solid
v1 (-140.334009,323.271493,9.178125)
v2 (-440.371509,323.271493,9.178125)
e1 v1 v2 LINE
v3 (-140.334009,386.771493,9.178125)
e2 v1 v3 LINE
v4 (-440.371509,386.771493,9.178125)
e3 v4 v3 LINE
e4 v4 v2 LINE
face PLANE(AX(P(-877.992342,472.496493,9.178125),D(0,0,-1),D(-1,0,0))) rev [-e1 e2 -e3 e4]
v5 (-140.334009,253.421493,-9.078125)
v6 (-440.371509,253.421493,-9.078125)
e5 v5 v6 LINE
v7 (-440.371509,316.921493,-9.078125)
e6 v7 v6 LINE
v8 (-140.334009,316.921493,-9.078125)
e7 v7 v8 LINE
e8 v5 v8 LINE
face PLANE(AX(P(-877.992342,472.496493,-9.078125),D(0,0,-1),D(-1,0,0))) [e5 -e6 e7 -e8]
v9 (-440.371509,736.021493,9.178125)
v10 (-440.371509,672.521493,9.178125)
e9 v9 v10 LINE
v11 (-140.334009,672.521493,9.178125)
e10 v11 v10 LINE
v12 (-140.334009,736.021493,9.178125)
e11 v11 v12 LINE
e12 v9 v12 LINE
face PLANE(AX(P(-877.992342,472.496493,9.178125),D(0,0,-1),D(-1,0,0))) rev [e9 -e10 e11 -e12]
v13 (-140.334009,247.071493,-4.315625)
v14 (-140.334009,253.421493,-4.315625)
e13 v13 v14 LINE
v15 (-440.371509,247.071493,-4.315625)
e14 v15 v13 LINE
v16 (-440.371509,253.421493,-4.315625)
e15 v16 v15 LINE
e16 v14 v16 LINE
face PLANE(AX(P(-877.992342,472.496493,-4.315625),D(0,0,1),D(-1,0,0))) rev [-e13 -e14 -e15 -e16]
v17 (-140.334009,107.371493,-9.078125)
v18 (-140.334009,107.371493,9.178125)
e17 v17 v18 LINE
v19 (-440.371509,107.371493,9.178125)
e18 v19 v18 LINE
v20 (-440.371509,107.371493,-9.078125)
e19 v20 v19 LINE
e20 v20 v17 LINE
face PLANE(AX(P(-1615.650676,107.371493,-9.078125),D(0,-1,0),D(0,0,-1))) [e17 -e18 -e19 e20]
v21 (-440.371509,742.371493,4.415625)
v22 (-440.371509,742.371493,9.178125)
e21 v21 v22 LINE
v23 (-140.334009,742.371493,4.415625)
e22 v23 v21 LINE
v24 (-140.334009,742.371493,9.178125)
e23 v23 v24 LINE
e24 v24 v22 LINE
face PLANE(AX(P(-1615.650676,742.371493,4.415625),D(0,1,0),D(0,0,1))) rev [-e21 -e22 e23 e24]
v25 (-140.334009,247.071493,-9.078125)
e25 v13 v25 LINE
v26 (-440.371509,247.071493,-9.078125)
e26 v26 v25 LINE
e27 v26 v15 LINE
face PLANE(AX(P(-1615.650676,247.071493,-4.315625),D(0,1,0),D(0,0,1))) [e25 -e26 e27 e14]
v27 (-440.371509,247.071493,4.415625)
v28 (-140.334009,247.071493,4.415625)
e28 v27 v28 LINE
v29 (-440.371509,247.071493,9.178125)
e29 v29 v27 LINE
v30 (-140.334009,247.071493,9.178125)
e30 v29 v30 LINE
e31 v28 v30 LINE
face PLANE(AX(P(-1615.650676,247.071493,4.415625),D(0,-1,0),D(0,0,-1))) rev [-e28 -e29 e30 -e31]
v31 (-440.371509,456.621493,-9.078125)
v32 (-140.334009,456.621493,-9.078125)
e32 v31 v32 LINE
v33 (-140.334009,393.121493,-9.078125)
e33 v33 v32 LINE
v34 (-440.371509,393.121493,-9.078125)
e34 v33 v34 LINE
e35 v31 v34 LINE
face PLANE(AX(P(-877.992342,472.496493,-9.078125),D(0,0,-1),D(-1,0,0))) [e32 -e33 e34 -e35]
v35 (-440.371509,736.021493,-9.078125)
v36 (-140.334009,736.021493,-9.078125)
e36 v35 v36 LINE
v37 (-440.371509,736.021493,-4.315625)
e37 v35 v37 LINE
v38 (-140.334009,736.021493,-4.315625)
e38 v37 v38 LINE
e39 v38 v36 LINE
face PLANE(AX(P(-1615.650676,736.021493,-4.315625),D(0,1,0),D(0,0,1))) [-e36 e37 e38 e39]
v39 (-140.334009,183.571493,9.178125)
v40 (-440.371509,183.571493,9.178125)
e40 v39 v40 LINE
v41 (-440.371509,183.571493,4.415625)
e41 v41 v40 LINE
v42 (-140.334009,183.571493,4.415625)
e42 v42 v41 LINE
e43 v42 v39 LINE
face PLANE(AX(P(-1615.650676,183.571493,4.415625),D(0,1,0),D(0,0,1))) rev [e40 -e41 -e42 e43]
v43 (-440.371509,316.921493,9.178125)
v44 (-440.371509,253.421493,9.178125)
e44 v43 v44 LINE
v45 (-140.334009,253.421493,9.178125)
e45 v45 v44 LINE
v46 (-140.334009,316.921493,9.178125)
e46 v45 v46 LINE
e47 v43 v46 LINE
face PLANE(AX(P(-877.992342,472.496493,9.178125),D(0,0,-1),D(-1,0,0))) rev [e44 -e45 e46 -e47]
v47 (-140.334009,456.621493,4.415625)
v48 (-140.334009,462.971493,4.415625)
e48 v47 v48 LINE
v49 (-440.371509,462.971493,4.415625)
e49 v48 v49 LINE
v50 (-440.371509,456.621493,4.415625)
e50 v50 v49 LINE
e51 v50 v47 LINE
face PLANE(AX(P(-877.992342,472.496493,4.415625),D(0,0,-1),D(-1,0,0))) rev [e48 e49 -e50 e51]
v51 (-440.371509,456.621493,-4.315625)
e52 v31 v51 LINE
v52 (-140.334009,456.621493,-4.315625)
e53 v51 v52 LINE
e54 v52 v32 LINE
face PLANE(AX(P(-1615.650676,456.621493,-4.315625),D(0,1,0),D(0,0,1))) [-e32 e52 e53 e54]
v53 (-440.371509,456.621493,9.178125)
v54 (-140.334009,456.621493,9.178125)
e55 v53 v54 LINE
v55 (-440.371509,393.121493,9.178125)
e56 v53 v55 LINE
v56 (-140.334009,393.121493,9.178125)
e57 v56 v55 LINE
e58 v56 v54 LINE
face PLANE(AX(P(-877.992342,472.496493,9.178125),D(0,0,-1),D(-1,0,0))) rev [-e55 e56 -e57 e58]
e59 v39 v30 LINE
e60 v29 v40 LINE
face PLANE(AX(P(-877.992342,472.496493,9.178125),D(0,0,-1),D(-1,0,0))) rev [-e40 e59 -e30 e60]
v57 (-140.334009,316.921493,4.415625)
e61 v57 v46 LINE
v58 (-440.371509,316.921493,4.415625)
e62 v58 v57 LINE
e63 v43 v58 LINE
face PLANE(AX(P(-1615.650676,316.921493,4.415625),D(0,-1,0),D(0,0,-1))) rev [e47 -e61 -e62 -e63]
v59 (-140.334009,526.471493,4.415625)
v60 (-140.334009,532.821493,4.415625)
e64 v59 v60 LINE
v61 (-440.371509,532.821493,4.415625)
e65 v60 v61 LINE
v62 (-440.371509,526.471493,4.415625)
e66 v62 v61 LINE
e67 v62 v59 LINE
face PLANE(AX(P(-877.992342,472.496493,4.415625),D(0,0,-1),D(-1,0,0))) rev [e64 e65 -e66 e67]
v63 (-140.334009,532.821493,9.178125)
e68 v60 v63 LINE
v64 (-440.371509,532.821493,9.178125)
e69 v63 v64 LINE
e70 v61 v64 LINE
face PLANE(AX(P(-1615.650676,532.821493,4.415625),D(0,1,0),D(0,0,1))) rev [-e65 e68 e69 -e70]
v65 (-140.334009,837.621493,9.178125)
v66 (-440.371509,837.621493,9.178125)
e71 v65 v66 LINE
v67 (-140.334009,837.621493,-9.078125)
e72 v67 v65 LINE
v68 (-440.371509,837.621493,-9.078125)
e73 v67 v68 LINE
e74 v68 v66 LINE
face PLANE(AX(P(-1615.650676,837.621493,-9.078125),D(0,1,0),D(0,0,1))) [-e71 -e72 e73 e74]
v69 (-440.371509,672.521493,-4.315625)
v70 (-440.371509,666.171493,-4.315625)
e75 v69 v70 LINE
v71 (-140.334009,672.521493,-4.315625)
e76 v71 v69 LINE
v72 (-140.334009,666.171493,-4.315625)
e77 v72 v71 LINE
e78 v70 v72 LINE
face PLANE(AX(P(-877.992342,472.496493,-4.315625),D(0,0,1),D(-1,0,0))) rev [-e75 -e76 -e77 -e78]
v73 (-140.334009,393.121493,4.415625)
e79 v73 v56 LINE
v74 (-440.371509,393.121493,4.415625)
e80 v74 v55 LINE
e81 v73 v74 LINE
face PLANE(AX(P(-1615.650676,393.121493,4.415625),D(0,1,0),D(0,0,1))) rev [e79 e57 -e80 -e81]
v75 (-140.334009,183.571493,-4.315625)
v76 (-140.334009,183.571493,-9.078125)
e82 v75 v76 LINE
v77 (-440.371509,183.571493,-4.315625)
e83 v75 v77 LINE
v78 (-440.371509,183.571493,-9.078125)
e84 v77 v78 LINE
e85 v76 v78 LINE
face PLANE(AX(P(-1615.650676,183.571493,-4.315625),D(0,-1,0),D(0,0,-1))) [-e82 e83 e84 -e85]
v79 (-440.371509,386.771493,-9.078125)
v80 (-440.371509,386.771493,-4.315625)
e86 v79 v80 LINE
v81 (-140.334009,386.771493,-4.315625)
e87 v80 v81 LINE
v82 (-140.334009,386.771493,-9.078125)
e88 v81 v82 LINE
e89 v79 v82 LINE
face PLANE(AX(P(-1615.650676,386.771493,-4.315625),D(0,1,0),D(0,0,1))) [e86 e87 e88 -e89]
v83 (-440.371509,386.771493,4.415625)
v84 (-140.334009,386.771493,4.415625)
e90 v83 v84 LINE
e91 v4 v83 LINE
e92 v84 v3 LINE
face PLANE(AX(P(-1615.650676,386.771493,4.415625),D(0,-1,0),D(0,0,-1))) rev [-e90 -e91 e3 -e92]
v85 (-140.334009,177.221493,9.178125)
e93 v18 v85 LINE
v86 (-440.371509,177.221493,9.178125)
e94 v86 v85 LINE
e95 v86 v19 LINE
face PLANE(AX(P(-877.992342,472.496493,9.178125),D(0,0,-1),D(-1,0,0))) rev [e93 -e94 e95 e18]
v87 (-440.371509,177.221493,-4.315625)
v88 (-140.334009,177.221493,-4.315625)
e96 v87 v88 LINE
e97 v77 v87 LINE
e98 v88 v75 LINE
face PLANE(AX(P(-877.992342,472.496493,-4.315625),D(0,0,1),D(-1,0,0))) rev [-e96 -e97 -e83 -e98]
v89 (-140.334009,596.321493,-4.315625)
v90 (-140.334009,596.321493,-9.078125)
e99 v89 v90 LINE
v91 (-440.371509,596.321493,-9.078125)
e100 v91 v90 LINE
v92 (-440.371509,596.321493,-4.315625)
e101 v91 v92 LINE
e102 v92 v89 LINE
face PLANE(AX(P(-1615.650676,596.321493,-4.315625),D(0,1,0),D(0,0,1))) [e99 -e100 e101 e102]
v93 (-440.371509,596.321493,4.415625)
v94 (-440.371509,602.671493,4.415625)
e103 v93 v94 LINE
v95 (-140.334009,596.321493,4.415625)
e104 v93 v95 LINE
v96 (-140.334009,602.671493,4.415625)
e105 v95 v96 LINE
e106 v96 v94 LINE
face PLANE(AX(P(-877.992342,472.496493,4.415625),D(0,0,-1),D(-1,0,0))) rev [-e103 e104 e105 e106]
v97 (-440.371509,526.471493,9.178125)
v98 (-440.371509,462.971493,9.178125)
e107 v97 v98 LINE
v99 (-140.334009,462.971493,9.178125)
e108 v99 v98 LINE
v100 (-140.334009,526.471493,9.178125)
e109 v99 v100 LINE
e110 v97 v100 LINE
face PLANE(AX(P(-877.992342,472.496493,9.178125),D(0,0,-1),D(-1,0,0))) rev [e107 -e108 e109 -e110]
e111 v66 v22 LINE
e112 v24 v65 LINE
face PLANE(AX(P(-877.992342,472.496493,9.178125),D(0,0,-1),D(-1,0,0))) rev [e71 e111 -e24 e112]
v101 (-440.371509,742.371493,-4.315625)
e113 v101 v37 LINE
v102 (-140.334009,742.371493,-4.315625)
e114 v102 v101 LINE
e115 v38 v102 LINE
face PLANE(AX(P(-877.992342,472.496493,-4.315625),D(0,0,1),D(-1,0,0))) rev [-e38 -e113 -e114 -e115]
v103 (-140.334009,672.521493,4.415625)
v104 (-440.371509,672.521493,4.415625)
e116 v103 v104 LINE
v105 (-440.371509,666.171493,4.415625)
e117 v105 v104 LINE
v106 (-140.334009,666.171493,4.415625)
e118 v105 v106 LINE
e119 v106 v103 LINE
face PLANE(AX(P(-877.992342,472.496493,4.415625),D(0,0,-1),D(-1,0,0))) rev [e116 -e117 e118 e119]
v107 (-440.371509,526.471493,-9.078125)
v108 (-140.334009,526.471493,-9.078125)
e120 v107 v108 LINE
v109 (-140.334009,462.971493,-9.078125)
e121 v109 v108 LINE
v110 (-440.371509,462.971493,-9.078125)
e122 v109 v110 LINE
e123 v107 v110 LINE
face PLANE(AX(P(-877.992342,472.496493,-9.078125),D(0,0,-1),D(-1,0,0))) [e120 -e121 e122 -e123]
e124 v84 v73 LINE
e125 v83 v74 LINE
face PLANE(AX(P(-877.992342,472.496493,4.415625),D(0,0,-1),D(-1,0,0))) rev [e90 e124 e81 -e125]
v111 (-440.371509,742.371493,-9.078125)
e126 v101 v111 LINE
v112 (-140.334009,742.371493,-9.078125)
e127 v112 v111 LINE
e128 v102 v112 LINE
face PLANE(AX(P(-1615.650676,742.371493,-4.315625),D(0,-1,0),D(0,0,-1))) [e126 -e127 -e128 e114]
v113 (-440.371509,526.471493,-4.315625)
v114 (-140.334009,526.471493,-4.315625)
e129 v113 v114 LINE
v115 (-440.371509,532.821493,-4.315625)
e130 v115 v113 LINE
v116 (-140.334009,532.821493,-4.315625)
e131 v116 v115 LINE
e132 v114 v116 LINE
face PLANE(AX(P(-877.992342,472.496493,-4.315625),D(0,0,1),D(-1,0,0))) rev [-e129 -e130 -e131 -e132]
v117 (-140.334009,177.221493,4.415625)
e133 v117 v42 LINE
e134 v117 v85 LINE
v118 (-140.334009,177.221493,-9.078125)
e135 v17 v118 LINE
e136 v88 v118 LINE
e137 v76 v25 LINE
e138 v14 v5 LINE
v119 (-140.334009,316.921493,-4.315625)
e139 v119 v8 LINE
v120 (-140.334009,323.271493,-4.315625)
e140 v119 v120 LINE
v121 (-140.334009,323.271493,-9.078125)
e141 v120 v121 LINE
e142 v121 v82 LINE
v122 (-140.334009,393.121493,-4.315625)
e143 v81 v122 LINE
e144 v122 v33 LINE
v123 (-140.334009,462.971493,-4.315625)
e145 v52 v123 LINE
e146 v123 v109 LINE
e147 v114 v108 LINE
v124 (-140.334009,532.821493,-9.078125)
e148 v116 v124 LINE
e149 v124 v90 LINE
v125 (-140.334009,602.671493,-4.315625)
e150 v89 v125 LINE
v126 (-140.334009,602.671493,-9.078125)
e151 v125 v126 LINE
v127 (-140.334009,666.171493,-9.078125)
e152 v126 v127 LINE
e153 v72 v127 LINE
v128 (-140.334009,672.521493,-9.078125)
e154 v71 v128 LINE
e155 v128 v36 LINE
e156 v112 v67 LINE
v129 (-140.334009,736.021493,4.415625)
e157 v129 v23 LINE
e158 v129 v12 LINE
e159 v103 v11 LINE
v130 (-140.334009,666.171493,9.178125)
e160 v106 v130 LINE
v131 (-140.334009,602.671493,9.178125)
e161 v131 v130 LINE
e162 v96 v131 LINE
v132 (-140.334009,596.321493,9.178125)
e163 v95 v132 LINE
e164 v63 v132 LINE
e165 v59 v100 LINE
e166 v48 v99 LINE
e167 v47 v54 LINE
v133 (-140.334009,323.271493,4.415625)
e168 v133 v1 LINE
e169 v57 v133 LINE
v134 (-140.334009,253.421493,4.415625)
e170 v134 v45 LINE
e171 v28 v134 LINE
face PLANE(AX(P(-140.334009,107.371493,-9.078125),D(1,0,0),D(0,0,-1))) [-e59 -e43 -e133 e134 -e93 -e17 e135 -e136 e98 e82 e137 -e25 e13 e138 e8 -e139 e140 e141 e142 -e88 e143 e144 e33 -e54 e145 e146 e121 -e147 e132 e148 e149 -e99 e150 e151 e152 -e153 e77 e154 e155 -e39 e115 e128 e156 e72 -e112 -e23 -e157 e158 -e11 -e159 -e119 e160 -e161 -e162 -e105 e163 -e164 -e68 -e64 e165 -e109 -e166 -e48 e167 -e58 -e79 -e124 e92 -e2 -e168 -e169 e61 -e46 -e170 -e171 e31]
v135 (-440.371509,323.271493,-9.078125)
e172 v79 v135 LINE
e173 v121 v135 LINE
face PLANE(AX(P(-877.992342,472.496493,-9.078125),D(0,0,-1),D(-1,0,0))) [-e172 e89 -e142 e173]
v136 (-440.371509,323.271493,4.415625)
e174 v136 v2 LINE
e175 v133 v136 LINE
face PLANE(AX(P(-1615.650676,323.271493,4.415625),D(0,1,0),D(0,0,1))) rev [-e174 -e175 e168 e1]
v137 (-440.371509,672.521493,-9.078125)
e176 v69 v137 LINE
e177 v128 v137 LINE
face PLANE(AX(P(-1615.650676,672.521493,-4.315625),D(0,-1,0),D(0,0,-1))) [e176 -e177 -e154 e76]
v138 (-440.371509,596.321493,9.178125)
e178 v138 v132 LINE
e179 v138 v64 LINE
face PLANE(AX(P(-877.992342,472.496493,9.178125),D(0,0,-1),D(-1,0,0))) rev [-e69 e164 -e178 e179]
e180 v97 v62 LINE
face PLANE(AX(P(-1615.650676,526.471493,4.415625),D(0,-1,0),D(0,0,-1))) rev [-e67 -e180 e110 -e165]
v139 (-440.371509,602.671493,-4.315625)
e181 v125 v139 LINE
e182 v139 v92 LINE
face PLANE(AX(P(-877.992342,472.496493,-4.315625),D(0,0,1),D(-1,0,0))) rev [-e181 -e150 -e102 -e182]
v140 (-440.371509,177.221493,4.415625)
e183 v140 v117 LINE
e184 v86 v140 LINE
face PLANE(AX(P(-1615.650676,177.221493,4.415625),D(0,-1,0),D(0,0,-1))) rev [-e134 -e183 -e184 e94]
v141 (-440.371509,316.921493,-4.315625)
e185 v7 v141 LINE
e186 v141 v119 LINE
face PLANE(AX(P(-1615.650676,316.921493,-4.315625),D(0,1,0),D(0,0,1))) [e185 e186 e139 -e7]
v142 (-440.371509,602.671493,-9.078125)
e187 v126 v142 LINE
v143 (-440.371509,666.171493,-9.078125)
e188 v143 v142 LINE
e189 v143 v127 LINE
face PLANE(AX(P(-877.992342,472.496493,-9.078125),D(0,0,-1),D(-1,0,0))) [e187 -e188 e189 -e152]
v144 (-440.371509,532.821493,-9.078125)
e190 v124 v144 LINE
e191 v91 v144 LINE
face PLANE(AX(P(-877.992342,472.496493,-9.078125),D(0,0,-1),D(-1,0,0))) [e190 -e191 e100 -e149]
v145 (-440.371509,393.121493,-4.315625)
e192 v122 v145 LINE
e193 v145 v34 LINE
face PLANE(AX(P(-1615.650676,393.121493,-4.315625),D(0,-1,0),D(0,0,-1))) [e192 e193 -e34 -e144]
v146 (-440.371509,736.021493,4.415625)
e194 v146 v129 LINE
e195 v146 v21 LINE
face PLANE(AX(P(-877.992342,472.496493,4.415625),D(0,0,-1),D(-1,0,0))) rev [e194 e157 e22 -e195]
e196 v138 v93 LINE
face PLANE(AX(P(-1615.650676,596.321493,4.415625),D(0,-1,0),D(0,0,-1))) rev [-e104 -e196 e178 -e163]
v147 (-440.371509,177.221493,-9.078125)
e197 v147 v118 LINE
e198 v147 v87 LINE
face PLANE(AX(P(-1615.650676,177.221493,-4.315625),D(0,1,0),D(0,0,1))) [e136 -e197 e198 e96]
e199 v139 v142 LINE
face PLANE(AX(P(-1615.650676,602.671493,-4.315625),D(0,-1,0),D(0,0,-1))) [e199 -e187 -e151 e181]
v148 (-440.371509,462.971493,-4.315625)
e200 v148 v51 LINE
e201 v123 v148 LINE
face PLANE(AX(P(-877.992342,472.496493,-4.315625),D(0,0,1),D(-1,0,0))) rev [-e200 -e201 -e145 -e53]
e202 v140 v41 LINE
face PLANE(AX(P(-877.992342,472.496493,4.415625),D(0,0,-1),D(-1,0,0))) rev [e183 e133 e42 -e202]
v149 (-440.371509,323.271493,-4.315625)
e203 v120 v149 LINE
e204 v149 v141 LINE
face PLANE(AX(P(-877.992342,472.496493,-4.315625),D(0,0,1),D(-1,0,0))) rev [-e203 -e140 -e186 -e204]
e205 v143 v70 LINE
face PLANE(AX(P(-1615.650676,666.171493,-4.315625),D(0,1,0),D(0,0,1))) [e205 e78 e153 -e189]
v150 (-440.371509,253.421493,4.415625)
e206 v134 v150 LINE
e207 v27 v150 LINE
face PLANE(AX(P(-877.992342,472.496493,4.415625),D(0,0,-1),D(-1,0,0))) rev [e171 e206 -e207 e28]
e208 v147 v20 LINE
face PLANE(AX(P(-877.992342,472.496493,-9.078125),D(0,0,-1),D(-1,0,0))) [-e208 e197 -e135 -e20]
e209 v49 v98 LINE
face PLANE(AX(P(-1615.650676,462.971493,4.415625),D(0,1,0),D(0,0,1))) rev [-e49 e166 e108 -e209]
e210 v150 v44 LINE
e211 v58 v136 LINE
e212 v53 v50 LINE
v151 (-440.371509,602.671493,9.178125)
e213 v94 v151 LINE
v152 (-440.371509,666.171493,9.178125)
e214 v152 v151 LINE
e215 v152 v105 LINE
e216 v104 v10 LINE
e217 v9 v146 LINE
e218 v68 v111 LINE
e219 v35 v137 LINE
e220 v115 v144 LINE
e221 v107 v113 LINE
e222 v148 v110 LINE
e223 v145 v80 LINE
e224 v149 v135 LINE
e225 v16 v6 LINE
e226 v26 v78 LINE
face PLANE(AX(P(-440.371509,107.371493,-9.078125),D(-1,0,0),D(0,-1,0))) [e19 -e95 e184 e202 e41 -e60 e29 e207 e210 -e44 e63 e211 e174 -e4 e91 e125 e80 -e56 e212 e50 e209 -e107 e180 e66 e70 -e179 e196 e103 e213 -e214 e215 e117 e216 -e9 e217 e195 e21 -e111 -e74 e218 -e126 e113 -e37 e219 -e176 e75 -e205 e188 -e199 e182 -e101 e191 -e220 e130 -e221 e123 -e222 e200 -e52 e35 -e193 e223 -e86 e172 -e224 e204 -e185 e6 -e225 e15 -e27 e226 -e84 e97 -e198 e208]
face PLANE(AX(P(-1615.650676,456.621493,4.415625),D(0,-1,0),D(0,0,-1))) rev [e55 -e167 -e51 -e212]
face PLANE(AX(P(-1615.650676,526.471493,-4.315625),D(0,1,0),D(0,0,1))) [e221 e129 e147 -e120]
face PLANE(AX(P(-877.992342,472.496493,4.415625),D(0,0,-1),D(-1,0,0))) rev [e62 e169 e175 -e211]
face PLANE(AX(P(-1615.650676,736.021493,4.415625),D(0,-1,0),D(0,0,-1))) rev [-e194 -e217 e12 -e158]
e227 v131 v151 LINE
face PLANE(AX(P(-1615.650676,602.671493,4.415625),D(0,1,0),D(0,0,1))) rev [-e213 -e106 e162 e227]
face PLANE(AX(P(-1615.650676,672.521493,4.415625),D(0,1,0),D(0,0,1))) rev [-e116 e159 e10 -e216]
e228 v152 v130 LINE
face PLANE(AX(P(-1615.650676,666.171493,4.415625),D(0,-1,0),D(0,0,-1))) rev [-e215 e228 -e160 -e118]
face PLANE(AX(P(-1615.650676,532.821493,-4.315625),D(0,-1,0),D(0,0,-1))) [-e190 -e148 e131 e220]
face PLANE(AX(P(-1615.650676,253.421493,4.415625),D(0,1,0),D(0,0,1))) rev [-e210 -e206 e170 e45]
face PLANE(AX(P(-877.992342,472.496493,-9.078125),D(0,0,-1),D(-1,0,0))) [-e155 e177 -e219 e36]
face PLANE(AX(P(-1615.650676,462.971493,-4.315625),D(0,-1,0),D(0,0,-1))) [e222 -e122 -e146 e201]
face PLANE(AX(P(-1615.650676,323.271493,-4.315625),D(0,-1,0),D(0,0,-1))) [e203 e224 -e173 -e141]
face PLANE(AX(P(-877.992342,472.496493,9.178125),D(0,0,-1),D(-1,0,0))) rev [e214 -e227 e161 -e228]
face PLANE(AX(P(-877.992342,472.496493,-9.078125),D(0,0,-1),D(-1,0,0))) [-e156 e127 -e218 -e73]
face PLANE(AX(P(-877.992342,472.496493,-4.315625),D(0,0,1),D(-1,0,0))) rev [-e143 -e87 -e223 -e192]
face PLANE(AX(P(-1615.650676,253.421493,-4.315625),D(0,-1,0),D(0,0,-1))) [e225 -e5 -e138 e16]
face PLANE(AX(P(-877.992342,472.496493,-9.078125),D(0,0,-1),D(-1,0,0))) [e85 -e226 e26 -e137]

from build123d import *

# Parameters (mm, degrees)
PARTSCAB_REFERENCE_START = -1615.650675561
PARTSCAB_REFERENCE_DEPTH = 1475.316666667
SKETCH1_OUTSIDE_W        = 1806.569
SKETCH1_OUTSIDE_H        = 1061.502
SKETCH1_OUTSIDE_W_2      = 300.0375
SKETCH1_OUTSIDE_H_2      = 730.25
CUT_EXTRUDE1_DEPTH       = 1820.964329577


# Read off the part's stored shape, not the designer's step: PartsCab_Reference
with BuildPart() as part:
    # PartsCab_Reference outline → PartsCab_Reference (new body)
    with BuildSketch(Plane.YZ.offset(PARTSCAB_REFERENCE_START)):
        Polygon((107.371492578, 9.178125), (107.371492578, -9.078125), (177.221492578, -9.078125), (177.221492578, -4.315625), (183.571492578, -4.315625), (183.571492578, -9.078125), (247.071492578, -9.078125), (247.071492578, -4.315625), (253.421492578, -4.315625), (253.421492578, -9.078125), (316.921492578, -9.078125), (316.921492578, -4.315625), (323.271492578, -4.315625), (323.271492578, -9.078125), (386.771492578, -9.078125), (386.771492578, -4.315625), (393.121492578, -4.315625), (393.121492578, -9.078125), (456.621492578, -9.078125), (456.621492578, -4.315625), (462.971492578, -4.315625), (462.971492578, -9.078125), (526.471492578, -9.078125), (526.471492578, -4.315625), (532.821492578, -4.315625), (532.821492578, -9.078125), (596.321492578, -9.078125), (596.321492578, -4.315625), (602.671492578, -4.315625), (602.671492578, -9.078125), (666.171492578, -9.078125), (666.171492578, -4.315625), (672.521492578, -4.315625), (672.521492578, -9.078125), (736.021492578, -9.078125), (736.021492578, -4.315625), (742.371492578, -4.315625), (742.371492578, -9.078125), (837.621492578, -9.078125), (837.621492578, 9.178125), (742.371492578, 9.178125), (742.371492578, 4.415625), (736.021492578, 4.415625), (736.021492578, 9.178125), (672.521492578, 9.178125), (672.521492578, 4.415625), (666.171492578, 4.415625), (666.171492578, 9.178125), (602.671492578, 9.178125), (602.671492578, 4.415625), (596.321492578, 4.415625), (596.321492578, 9.178125), (532.821492578, 9.178125), (532.821492578, 4.415625), (526.471492578, 4.415625), (526.471492578, 9.178125), (462.971492578, 9.178125), (462.971492578, 4.415625), (456.621492578, 4.415625), (456.621492578, 9.178125), (393.121492578, 9.178125), (393.121492578, 4.415625), (386.771492578, 4.415625), (386.771492578, 9.178125), (323.271492578, 9.178125), (323.271492578, 4.415625), (316.921492578, 4.415625), (316.921492578, 9.178125), (253.421492578, 9.178125), (253.421492578, 4.415625), (247.071492578, 4.415625), (247.071492578, 9.178125), (183.571492578, 9.178125), (183.571492578, 4.415625), (177.221492578, 4.415625), (177.221492578, 9.178125), align=None)
    extrude(amount=PARTSCAB_REFERENCE_DEPTH)

    # Sketch1 outside → Cut-Extrude1 (cut, through all)
    with BuildSketch(Plane.XY.offset(9.178125)):
        with Locations((-877.9925, 472.496)):
            Rectangle(SKETCH1_OUTSIDE_W, SKETCH1_OUTSIDE_H)
        with Locations((-290.352758894, 472.496492578)):
            Rectangle(SKETCH1_OUTSIDE_W_2, SKETCH1_OUTSIDE_H_2, mode=Mode.SUBTRACT)
    extrude(amount=-CUT_EXTRUDE1_DEPTH, mode=Mode.SUBTRACT)


solid = part.part
